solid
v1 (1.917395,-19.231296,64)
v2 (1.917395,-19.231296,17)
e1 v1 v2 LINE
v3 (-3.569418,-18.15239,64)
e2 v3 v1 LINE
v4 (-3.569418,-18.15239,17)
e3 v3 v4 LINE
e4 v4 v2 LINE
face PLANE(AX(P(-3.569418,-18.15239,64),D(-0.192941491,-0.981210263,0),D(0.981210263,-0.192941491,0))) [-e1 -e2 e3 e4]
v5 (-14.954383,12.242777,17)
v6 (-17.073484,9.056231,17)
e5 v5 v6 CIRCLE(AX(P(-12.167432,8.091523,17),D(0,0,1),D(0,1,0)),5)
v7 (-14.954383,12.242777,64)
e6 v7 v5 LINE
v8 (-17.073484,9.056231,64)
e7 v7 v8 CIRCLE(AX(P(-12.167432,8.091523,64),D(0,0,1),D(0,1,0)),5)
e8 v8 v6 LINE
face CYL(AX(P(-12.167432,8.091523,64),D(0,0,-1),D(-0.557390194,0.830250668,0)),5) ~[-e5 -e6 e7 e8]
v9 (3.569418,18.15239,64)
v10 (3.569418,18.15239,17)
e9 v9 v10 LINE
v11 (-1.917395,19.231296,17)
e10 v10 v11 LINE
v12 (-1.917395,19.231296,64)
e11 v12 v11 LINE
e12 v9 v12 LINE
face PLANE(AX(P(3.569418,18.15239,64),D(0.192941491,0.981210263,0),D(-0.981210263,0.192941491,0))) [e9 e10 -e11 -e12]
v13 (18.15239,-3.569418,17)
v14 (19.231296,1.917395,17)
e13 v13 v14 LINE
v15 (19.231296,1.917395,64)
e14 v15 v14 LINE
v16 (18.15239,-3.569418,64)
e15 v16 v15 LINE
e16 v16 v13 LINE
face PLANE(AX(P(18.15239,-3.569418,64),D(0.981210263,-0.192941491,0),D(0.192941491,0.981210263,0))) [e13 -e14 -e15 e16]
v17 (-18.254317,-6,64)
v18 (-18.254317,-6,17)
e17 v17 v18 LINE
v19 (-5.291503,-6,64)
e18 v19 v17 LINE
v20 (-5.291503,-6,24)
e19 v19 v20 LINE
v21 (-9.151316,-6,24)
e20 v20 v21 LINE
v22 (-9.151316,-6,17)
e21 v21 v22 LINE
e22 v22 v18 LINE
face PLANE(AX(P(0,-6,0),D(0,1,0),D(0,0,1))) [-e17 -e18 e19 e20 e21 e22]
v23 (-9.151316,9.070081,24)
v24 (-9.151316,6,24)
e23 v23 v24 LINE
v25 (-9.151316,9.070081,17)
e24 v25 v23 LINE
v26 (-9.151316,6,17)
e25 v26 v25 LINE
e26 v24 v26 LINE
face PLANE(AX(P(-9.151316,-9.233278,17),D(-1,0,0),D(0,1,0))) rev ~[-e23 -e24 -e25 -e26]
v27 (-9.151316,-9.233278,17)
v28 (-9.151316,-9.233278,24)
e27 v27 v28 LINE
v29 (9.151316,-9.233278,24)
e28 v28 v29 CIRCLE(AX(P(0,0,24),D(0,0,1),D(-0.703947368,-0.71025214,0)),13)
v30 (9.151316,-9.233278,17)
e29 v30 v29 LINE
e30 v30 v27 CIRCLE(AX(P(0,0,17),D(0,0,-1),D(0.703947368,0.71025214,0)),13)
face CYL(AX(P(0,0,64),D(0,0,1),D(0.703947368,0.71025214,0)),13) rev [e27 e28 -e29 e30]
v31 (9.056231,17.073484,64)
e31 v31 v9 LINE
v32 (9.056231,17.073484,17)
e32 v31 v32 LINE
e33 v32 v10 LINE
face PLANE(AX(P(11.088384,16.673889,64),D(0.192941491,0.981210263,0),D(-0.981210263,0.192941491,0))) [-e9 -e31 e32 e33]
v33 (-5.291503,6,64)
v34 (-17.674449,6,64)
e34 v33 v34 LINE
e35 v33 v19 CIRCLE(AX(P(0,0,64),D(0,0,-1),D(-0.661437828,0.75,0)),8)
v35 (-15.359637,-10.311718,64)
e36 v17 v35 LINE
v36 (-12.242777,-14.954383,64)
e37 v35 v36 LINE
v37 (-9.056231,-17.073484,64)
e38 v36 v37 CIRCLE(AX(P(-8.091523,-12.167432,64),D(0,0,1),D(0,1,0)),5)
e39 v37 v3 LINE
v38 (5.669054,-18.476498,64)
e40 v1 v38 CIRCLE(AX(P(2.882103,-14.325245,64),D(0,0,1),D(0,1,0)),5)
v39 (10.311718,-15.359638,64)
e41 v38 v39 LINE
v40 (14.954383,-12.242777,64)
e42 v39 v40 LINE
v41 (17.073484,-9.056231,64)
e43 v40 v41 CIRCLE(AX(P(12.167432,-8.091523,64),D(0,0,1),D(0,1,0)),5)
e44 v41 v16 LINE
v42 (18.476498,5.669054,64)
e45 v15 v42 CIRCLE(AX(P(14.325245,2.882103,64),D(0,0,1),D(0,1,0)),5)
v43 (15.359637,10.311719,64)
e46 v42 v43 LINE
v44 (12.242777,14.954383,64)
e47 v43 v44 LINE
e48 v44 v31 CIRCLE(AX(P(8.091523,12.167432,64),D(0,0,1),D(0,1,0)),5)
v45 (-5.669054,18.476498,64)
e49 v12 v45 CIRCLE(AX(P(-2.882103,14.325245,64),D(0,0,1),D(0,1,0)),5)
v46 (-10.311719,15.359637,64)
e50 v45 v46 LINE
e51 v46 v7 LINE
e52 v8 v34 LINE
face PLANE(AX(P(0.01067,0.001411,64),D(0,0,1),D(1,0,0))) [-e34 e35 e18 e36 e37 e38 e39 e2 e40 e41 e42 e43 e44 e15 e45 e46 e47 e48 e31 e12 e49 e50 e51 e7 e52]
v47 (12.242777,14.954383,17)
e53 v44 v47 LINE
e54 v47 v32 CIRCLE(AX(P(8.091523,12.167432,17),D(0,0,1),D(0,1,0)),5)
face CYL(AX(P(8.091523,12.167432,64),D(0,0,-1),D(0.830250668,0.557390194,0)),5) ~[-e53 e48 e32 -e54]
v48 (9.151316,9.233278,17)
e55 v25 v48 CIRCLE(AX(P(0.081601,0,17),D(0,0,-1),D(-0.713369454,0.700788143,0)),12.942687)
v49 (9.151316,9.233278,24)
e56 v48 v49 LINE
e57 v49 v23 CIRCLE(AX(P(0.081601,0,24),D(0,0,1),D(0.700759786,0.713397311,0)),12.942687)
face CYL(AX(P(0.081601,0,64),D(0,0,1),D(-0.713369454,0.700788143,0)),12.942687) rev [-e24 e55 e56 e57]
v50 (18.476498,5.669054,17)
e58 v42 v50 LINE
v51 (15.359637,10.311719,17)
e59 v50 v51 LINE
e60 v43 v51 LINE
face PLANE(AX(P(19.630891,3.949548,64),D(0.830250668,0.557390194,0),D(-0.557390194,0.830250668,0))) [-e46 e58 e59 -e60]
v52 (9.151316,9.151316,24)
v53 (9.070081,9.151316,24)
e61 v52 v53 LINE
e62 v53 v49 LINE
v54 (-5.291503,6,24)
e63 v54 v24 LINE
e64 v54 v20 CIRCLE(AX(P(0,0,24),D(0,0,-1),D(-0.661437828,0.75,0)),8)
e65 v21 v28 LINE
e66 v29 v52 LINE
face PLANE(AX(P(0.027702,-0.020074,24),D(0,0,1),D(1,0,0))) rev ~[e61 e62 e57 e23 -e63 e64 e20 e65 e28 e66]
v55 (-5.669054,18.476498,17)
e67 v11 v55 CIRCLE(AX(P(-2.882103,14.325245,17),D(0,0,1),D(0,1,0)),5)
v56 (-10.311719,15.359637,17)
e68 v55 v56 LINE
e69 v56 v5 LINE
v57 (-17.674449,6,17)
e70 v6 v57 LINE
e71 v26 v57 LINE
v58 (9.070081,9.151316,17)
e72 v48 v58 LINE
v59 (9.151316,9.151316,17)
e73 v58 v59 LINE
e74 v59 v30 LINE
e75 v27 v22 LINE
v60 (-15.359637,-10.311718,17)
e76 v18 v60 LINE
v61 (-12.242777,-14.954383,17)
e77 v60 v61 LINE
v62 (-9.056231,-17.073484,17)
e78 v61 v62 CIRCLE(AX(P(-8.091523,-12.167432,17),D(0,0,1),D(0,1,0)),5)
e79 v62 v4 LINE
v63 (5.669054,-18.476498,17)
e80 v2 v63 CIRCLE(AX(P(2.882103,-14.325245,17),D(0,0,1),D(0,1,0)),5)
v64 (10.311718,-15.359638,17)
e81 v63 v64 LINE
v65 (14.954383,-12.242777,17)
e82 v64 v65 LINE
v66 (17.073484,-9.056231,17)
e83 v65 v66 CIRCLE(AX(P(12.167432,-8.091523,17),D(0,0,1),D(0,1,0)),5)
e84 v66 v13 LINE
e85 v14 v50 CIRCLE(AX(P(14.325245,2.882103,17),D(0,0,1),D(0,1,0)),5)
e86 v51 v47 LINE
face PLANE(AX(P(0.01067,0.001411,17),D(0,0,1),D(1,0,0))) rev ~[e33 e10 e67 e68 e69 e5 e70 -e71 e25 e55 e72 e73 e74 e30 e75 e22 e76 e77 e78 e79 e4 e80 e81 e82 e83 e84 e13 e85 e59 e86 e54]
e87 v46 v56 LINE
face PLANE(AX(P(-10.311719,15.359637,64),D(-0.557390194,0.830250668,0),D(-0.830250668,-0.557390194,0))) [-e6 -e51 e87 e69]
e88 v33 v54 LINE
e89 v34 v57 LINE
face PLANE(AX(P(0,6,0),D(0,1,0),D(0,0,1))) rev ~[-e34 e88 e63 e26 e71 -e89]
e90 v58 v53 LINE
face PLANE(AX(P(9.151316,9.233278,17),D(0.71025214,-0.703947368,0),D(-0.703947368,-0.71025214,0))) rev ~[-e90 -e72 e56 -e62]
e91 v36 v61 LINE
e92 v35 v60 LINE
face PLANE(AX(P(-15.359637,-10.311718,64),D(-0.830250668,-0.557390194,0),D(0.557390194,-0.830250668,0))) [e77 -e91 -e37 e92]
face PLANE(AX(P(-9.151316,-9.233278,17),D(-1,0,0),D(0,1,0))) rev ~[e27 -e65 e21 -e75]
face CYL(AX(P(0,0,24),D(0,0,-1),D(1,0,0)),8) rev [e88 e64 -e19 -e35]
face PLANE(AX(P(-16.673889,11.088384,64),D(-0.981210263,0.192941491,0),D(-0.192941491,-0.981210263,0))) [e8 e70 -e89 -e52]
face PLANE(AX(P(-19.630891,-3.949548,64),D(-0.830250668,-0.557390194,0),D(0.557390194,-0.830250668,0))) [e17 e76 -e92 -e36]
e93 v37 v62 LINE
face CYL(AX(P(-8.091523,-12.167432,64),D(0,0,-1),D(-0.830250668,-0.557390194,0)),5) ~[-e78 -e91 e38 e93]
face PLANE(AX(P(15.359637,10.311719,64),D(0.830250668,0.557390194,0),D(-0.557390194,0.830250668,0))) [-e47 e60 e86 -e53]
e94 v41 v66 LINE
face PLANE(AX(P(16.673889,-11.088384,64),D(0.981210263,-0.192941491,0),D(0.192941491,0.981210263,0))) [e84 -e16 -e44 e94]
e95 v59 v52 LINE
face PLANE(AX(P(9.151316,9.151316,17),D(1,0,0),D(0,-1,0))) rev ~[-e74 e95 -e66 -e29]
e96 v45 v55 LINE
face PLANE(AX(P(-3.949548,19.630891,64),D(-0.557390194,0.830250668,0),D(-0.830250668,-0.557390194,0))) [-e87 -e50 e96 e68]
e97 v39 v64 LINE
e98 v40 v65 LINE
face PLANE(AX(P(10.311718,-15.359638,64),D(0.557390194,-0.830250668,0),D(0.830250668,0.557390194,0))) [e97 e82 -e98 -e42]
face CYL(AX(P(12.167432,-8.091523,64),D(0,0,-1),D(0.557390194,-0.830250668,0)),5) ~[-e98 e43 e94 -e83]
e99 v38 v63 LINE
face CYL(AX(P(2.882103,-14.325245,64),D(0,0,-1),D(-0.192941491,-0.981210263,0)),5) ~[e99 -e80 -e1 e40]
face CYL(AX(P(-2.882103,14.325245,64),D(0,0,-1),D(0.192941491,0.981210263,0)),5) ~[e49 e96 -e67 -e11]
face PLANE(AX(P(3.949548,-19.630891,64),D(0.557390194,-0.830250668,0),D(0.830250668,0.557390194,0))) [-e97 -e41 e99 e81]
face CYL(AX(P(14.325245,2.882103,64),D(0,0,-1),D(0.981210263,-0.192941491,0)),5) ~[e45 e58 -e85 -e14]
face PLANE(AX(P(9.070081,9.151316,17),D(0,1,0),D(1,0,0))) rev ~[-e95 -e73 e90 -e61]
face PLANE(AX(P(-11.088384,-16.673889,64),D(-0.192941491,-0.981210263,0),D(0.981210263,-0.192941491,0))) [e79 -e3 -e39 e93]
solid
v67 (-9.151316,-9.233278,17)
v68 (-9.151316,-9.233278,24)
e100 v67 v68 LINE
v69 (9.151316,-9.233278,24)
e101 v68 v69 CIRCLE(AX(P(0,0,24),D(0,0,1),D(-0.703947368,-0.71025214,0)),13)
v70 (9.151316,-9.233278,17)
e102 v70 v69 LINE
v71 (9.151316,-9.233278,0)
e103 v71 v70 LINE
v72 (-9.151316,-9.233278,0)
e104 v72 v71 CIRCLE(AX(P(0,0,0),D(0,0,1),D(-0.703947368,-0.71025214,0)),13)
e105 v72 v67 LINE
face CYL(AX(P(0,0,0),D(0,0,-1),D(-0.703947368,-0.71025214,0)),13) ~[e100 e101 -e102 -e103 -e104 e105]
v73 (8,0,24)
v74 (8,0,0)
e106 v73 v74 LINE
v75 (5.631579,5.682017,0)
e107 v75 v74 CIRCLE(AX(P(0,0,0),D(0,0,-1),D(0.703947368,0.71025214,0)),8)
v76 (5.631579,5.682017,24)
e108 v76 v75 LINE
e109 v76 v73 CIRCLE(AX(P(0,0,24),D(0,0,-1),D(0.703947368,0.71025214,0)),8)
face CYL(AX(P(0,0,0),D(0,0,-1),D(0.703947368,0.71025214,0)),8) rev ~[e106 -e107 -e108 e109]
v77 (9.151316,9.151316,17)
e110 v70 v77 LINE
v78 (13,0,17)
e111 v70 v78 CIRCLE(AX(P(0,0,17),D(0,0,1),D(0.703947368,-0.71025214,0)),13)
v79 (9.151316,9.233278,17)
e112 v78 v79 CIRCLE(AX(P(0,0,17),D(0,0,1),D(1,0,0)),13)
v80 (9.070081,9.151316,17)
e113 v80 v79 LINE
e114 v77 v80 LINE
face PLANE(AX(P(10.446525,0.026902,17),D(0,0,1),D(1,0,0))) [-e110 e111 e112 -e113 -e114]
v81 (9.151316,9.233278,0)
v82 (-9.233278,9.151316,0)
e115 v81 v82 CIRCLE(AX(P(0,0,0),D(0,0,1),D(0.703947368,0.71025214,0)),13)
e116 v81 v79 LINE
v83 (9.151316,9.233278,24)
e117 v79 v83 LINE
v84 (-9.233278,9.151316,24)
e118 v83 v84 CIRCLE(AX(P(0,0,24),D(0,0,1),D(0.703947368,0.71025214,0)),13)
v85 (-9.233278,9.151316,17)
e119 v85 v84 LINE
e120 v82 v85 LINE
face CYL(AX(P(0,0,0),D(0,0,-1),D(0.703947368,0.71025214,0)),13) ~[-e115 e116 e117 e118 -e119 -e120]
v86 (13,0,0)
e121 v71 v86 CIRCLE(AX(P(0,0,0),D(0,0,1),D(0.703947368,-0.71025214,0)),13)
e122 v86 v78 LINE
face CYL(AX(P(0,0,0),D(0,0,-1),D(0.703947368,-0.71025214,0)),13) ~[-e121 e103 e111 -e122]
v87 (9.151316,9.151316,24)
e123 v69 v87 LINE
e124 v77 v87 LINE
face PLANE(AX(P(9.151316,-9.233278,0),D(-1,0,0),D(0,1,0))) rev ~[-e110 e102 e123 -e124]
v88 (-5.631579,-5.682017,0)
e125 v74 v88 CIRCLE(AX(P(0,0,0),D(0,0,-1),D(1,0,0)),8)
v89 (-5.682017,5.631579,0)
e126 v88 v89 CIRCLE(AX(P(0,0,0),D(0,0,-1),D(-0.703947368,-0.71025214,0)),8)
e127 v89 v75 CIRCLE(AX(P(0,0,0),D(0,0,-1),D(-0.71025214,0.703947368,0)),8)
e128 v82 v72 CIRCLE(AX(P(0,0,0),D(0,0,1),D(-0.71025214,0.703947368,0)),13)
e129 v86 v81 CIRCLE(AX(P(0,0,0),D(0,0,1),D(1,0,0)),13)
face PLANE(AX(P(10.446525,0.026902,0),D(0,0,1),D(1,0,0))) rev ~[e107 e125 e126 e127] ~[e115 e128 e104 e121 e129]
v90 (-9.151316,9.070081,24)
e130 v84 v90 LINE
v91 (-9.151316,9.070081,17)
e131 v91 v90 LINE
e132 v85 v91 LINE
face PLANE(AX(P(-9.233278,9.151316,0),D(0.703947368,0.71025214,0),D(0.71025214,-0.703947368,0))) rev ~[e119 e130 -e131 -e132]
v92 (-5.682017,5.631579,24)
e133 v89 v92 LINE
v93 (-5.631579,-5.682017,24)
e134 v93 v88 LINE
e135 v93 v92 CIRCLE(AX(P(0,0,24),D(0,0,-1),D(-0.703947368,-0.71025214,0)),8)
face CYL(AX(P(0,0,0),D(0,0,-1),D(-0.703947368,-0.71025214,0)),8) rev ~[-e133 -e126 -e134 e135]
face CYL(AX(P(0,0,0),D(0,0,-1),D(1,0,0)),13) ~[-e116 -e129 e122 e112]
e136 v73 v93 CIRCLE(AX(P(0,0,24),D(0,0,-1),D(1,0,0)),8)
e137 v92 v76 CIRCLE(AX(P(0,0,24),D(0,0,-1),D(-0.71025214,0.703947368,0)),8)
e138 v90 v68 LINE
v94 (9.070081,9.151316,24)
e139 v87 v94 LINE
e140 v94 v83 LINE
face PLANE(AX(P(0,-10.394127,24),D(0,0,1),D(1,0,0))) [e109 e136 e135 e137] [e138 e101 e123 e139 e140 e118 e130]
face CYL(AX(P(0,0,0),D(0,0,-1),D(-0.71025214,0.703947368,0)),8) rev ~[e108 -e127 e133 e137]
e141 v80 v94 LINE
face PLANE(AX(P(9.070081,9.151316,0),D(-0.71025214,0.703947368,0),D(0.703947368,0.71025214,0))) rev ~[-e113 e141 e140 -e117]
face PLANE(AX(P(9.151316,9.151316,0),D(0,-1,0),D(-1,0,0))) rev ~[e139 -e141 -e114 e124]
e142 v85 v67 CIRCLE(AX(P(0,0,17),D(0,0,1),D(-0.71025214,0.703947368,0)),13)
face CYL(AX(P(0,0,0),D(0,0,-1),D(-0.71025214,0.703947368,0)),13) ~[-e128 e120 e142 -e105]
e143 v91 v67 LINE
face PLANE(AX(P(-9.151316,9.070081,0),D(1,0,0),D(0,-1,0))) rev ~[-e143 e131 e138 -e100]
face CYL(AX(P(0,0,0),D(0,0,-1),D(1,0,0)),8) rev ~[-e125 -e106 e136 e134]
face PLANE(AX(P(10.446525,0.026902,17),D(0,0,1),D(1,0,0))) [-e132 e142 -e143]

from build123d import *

# Parameters (mm, degrees)
F1_DEPTH  = 24
F2_DEPTH  = 17
F3_R      = 8
F4_DEPTH  = 40
F6_DEPTH  = 47
F8_DEPTH  = 47
F10_DEPTH = 47
F11_W     = 12
F11_H     = 90
F12_DEPTH = 25
F13_R     = 5


with BuildPart() as f1:
    # F0 (on Top) → F1 (new body)
    with BuildSketch(Plane.XY):
        with BuildLine():
            ThreePointArc((-9.1513157895, -9.2332778211), (0, -13), (9.1513157895, -9.2332778211))
            Line((9.1513157895, -9.2332778211), (-9.1513157895, -9.2332778211))
        make_face()
        with BuildLine():
            Line((-9.1513157895, -9.2332778211), (9.1513157895, -9.2332778211))
            Line((9.1513157895, -9.2332778211), (9.1513157895, 9.1513157895))
            Line((9.1513157895, 9.1513157895), (9.0700813191, 9.1513157895))
            Line((9.0700813191, 9.1513157895), (5.6315789474, 5.6820171207))
            ThreePointArc((5.6315789474, 5.6820171207), (7.3841936452, 3.0779350563), (8, 0))
            ThreePointArc((8, 0), (3.0779350563, -7.3841936452), (-5.6315789474, -5.6820171207))
            Line((-5.6315789474, -5.6820171207), (-9.1513157895, -9.2332778211))
        make_face()
        with BuildLine():
            Line((-9.1513157895, 9.0700813191), (-9.1513157895, -9.2332778211))
            Line((-9.1513157895, -9.2332778211), (-5.6315789474, -5.6820171207))
            ThreePointArc((-5.6315789474, -5.6820171207), (-7.9999204993, -0.0356651744), (-5.6820171207, 5.6315789474))
            Line((-5.6820171207, 5.6315789474), (-9.1513157895, 9.0700813191))
        make_face()
        with BuildLine():
            Line((5.6315789474, 5.6820171207), (9.0700813191, 9.1513157895))
            Line((9.0700813191, 9.1513157895), (-9.1513157895, 9.1513157895))
            Line((-9.1513157895, 9.1513157895), (-9.1513157895, 9.0700813191))
            Line((-9.1513157895, 9.0700813191), (-5.6820171207, 5.6315789474))
            ThreePointArc((-5.6820171207, 5.6315789474), (-0.0356651744, 7.9999204993), (5.6315789474, 5.6820171207))
        make_face()
        with BuildLine():
            Line((9.0700813191, 9.1513157895), (9.1513157895, 9.2332778211))
            ThreePointArc((9.1513157895, 9.2332778211), (-0.0579559084, 12.9998708114), (-9.2332778211, 9.1513157895))
            Line((-9.2332778211, 9.1513157895), (-9.1513157895, 9.0700813191))
            Line((-9.1513157895, 9.0700813191), (-9.1513157895, 9.1513157895))
            Line((-9.1513157895, 9.1513157895), (9.0700813191, 9.1513157895))
        make_face()
    extrude(amount=F1_DEPTH)

    # F0 (on Top) → F2 (join)
    with BuildSketch(Plane.XY):
        with BuildLine():
            ThreePointArc((9.1513157895, -9.2332778211), (11.9993146734, -5.0016444664), (13, 0))
            ThreePointArc((13, 0), (11.9993146734, 5.0016444664), (9.1513157895, 9.2332778211))
            Line((9.1513157895, 9.2332778211), (9.0700813191, 9.1513157895))
            Line((9.0700813191, 9.1513157895), (9.1513157895, 9.1513157895))
            Line((9.1513157895, 9.1513157895), (9.1513157895, -9.2332778211))
        make_face()
        with BuildLine():
            Line((9.0700813191, 9.1513157895), (9.1513157895, 9.2332778211))
            ThreePointArc((9.1513157895, 9.2332778211), (-0.0579559084, 12.9998708114), (-9.2332778211, 9.1513157895))
            Line((-9.2332778211, 9.1513157895), (-9.1513157895, 9.0700813191))
            Line((-9.1513157895, 9.0700813191), (-9.1513157895, 9.1513157895))
            Line((-9.1513157895, 9.1513157895), (9.0700813191, 9.1513157895))
        make_face()
        with BuildLine():
            ThreePointArc((-9.1513157895, -9.2332778211), (0, -13), (9.1513157895, -9.2332778211))
            Line((9.1513157895, -9.2332778211), (-9.1513157895, -9.2332778211))
        make_face()
        with BuildLine():
            Line((-9.1513157895, -9.2332778211), (9.1513157895, -9.2332778211))
            Line((9.1513157895, -9.2332778211), (9.1513157895, 9.1513157895))
            Line((9.1513157895, 9.1513157895), (9.0700813191, 9.1513157895))
            Line((9.0700813191, 9.1513157895), (5.6315789474, 5.6820171207))
            ThreePointArc((5.6315789474, 5.6820171207), (7.3841936452, 3.0779350563), (8, 0))
            ThreePointArc((8, 0), (3.0779350563, -7.3841936452), (-5.6315789474, -5.6820171207))
            Line((-5.6315789474, -5.6820171207), (-9.1513157895, -9.2332778211))
        make_face()
        with BuildLine():
            Line((-9.1513157895, 9.0700813191), (-9.2332778211, 9.1513157895))
            ThreePointArc((-9.2332778211, 9.1513157895), (-12.9998708114, -0.0579559084), (-9.1513157895, -9.2332778211))
            Line((-9.1513157895, -9.2332778211), (-9.1513157895, 9.0700813191))
        make_face()
        with BuildLine():
            Line((-9.1513157895, 9.0700813191), (-9.1513157895, -9.2332778211))
            Line((-9.1513157895, -9.2332778211), (-5.6315789474, -5.6820171207))
            ThreePointArc((-5.6315789474, -5.6820171207), (-7.9999204993, -0.0356651744), (-5.6820171207, 5.6315789474))
            Line((-5.6820171207, 5.6315789474), (-9.1513157895, 9.0700813191))
        make_face()
    extrude(amount=F2_DEPTH)


with BuildPart() as f4:
    # F3 (on face) → F4 (new body)
    with BuildSketch(Plane.XY.offset(24)):
        with BuildLine():
            Line((-9.1513157895, 9.0700813191), (-9.1513157895, -9.2332778211))
            ThreePointArc((-9.1513157895, -9.2332778211), (0, -13), (9.1513157895, -9.2332778211))
            Line((9.1513157895, -9.2332778211), (9.1513157895, 9.1513157895))
            Line((9.1513157895, 9.1513157895), (9.0700813191, 9.1513157895))
            Line((9.0700813191, 9.1513157895), (9.1513157895, 9.2332778211))
            ThreePointArc((9.1513157895, 9.2332778211), (-0.0337981522, 12.9421721373), (-9.1513157895, 9.0700813191))
        make_face()
        Circle(F3_R, mode=Mode.SUBTRACT)
    extrude(amount=F4_DEPTH)

    # F5 (on face) → F6 (join)
    with BuildSketch(Plane.XY.offset(17)):
        with BuildLine():
            Line((-9.1513157895, 9.0700813191), (-9.2332778211, 9.1513157895))
            ThreePointArc((-9.2332778211, 9.1513157895), (-12.9998708114, -0.0579559084), (-9.1513157895, -9.2332778211))
            Line((-9.1513157895, -9.2332778211), (-9.1513157895, 9.0700813191))
        make_face()
    extrude(amount=F6_DEPTH)

    # F7 (on face) → F8 (join)
    with BuildSketch(Plane.XY.offset(17)):
        with BuildLine():
            Line((9.0700813191, 9.1513157895), (9.1513157895, 9.1513157895))
            Line((9.1513157895, 9.1513157895), (9.1513157895, -9.2332778211))
            ThreePointArc((9.1513157895, -9.2332778211), (13, 0), (9.1513157895, 9.2332778211))
            Line((9.1513157895, 9.2332778211), (9.0700813191, 9.1513157895))
        make_face()
    extrude(amount=F8_DEPTH)

    # F9 (on face) → F10 (join)
    with BuildSketch(Plane.XY.offset(64)):
        with BuildLine():
            ThreePointArc((18.1523898541, -3.5694176815), (18.4128923896, -1.7931519315), (18.5, 0))
            ThreePointArc((18.5, 0), (17.6975039115, 5.3896526142), (15.3596372646, 10.3117187267))
            ThreePointArc((15.3596372646, 10.3117187267), (10.2443307659, 15.4046644611), (3.569417868, 18.1523898174))
            ThreePointArc((3.569417868, 18.1523898174), (-3.6489068915, 18.1365784672), (-10.3117186292, 15.3596373301))
            ThreePointArc((-10.3117186292, 15.3596373301), (-15.4046644936, 10.244330717), (-18.1523898628, 3.5694176374))
            ThreePointArc((-18.1523898628, 3.5694176374), (-18.1365784716, -3.6489068696), (-15.359637486, -10.311718397))
            ThreePointArc((-15.359637486, -10.311718397), (-10.2443309802, -15.4046643186), (-3.5694179833, -18.1523897947))
            ThreePointArc((-3.5694179833, -18.1523897947), (3.6489066832, -18.1365785091), (10.311718374, -15.3596375014))
            ThreePointArc((10.311718374, -15.3596375014), (15.4046643961, -10.2443308636), (18.1523898541, -3.5694176815))
        make_face()
        with BuildLine():
            ThreePointArc((-9.1513157895, 9.0700813191), (-0.0337981522, 12.9421721373), (9.1513157895, 9.2332778211))
            ThreePointArc((9.1513157895, 9.2332778211), (0.0579559084, -12.9998708114), (-9.2332778211, 9.1513157895))
            Line((-9.2332778211, 9.1513157895), (-9.1513157895, 9.0700813191))
        make_face(mode=Mode.SUBTRACT)
        with BuildLine():
            Line((3.949548491, -19.6308910463), (10.311718374, -15.3596375014))
            ThreePointArc((10.311718374, -15.3596375014), (3.6489066832, -18.1365785091), (-3.5694179833, -18.1523897947))
            Line((-3.5694179833, -18.1523897947), (3.949548491, -19.6308910463))
        make_face()
        with BuildLine():
            Line((-11.088383659, -16.6738887002), (-3.5694179833, -18.1523897947))
            ThreePointArc((-3.5694179833, -18.1523897947), (-10.2443309802, -15.4046643186), (-15.359637486, -10.311718397))
            Line((-15.359637486, -10.311718397), (-11.088383659, -16.6738887002))
        make_face()
        with BuildLine():
            ThreePointArc((-15.359637486, -10.311718397), (-18.1365784716, -3.6489068696), (-18.1523898628, 3.5694176374))
            Line((-18.1523898628, 3.5694176374), (-19.6308910463, -3.949548491))
            Line((-19.6308910463, -3.949548491), (-15.359637486, -10.311718397))
        make_face()
        with BuildLine():
            ThreePointArc((-18.1523898628, 3.5694176374), (-15.4046644936, 10.244330717), (-10.3117186292, 15.3596373301))
            Line((-10.3117186292, 15.3596373301), (-16.6738887002, 11.088383659))
            Line((-16.6738887002, 11.088383659), (-18.1523898628, 3.5694176374))
        make_face()
        with BuildLine():
            ThreePointArc((-10.3117186292, 15.3596373301), (-3.6489068915, 18.1365784672), (3.569417868, 18.1523898174))
            Line((3.569417868, 18.1523898174), (-3.949548491, 19.6308910463))
            Line((-3.949548491, 19.6308910463), (-10.3117186292, 15.3596373301))
        make_face()
        with BuildLine():
            ThreePointArc((3.569417868, 18.1523898174), (10.2443307659, 15.4046644611), (15.3596372646, 10.3117187267))
            Line((15.3596372646, 10.3117187267), (11.088383659, 16.6738887002))
            Line((11.088383659, 16.6738887002), (3.569417868, 18.1523898174))
        make_face()
        with BuildLine():
            ThreePointArc((15.3596372646, 10.3117187267), (17.6975039115, 5.3896526142), (18.5, 0))
            ThreePointArc((18.5, 0), (18.4128923896, -1.7931519315), (18.1523898541, -3.5694176815))
            Line((18.1523898541, -3.5694176815), (19.6308910463, 3.949548491))
            Line((19.6308910463, 3.949548491), (15.3596372646, 10.3117187267))
        make_face()
        with BuildLine():
            Line((16.6738887002, -11.088383659), (18.1523898541, -3.5694176815))
            ThreePointArc((18.1523898541, -3.5694176815), (15.4046643961, -10.2443308636), (10.311718374, -15.3596375014))
            Line((10.311718374, -15.3596375014), (16.6738887002, -11.088383659))
        make_face()
    extrude(amount=-F10_DEPTH)

    # F11 (on Right) → F12 (cut)
    with BuildSketch(Plane.YZ):
        with Locations((0, 45)):
            Rectangle(F11_W, F11_H)
    extrude(amount=-F12_DEPTH, mode=Mode.SUBTRACT)

    # F13
    f13_edges = [f4.edges().sort_by_distance(p)[0] for p in [
        (16.673889, -11.088384, 40.5),
        (3.949548, -19.630891, 40.5),
        (19.630891, 3.949548, 40.5),
        (11.088384, 16.673889, 40.5),
        (-3.949548, 19.630891, 40.5),
        (-16.673889, 11.088384, 40.5),
        (-11.088384, -16.673889, 40.5),
    ]]
    fillet(f13_edges, radius=F13_R)


solid = Compound([f1.part, f4.part])
